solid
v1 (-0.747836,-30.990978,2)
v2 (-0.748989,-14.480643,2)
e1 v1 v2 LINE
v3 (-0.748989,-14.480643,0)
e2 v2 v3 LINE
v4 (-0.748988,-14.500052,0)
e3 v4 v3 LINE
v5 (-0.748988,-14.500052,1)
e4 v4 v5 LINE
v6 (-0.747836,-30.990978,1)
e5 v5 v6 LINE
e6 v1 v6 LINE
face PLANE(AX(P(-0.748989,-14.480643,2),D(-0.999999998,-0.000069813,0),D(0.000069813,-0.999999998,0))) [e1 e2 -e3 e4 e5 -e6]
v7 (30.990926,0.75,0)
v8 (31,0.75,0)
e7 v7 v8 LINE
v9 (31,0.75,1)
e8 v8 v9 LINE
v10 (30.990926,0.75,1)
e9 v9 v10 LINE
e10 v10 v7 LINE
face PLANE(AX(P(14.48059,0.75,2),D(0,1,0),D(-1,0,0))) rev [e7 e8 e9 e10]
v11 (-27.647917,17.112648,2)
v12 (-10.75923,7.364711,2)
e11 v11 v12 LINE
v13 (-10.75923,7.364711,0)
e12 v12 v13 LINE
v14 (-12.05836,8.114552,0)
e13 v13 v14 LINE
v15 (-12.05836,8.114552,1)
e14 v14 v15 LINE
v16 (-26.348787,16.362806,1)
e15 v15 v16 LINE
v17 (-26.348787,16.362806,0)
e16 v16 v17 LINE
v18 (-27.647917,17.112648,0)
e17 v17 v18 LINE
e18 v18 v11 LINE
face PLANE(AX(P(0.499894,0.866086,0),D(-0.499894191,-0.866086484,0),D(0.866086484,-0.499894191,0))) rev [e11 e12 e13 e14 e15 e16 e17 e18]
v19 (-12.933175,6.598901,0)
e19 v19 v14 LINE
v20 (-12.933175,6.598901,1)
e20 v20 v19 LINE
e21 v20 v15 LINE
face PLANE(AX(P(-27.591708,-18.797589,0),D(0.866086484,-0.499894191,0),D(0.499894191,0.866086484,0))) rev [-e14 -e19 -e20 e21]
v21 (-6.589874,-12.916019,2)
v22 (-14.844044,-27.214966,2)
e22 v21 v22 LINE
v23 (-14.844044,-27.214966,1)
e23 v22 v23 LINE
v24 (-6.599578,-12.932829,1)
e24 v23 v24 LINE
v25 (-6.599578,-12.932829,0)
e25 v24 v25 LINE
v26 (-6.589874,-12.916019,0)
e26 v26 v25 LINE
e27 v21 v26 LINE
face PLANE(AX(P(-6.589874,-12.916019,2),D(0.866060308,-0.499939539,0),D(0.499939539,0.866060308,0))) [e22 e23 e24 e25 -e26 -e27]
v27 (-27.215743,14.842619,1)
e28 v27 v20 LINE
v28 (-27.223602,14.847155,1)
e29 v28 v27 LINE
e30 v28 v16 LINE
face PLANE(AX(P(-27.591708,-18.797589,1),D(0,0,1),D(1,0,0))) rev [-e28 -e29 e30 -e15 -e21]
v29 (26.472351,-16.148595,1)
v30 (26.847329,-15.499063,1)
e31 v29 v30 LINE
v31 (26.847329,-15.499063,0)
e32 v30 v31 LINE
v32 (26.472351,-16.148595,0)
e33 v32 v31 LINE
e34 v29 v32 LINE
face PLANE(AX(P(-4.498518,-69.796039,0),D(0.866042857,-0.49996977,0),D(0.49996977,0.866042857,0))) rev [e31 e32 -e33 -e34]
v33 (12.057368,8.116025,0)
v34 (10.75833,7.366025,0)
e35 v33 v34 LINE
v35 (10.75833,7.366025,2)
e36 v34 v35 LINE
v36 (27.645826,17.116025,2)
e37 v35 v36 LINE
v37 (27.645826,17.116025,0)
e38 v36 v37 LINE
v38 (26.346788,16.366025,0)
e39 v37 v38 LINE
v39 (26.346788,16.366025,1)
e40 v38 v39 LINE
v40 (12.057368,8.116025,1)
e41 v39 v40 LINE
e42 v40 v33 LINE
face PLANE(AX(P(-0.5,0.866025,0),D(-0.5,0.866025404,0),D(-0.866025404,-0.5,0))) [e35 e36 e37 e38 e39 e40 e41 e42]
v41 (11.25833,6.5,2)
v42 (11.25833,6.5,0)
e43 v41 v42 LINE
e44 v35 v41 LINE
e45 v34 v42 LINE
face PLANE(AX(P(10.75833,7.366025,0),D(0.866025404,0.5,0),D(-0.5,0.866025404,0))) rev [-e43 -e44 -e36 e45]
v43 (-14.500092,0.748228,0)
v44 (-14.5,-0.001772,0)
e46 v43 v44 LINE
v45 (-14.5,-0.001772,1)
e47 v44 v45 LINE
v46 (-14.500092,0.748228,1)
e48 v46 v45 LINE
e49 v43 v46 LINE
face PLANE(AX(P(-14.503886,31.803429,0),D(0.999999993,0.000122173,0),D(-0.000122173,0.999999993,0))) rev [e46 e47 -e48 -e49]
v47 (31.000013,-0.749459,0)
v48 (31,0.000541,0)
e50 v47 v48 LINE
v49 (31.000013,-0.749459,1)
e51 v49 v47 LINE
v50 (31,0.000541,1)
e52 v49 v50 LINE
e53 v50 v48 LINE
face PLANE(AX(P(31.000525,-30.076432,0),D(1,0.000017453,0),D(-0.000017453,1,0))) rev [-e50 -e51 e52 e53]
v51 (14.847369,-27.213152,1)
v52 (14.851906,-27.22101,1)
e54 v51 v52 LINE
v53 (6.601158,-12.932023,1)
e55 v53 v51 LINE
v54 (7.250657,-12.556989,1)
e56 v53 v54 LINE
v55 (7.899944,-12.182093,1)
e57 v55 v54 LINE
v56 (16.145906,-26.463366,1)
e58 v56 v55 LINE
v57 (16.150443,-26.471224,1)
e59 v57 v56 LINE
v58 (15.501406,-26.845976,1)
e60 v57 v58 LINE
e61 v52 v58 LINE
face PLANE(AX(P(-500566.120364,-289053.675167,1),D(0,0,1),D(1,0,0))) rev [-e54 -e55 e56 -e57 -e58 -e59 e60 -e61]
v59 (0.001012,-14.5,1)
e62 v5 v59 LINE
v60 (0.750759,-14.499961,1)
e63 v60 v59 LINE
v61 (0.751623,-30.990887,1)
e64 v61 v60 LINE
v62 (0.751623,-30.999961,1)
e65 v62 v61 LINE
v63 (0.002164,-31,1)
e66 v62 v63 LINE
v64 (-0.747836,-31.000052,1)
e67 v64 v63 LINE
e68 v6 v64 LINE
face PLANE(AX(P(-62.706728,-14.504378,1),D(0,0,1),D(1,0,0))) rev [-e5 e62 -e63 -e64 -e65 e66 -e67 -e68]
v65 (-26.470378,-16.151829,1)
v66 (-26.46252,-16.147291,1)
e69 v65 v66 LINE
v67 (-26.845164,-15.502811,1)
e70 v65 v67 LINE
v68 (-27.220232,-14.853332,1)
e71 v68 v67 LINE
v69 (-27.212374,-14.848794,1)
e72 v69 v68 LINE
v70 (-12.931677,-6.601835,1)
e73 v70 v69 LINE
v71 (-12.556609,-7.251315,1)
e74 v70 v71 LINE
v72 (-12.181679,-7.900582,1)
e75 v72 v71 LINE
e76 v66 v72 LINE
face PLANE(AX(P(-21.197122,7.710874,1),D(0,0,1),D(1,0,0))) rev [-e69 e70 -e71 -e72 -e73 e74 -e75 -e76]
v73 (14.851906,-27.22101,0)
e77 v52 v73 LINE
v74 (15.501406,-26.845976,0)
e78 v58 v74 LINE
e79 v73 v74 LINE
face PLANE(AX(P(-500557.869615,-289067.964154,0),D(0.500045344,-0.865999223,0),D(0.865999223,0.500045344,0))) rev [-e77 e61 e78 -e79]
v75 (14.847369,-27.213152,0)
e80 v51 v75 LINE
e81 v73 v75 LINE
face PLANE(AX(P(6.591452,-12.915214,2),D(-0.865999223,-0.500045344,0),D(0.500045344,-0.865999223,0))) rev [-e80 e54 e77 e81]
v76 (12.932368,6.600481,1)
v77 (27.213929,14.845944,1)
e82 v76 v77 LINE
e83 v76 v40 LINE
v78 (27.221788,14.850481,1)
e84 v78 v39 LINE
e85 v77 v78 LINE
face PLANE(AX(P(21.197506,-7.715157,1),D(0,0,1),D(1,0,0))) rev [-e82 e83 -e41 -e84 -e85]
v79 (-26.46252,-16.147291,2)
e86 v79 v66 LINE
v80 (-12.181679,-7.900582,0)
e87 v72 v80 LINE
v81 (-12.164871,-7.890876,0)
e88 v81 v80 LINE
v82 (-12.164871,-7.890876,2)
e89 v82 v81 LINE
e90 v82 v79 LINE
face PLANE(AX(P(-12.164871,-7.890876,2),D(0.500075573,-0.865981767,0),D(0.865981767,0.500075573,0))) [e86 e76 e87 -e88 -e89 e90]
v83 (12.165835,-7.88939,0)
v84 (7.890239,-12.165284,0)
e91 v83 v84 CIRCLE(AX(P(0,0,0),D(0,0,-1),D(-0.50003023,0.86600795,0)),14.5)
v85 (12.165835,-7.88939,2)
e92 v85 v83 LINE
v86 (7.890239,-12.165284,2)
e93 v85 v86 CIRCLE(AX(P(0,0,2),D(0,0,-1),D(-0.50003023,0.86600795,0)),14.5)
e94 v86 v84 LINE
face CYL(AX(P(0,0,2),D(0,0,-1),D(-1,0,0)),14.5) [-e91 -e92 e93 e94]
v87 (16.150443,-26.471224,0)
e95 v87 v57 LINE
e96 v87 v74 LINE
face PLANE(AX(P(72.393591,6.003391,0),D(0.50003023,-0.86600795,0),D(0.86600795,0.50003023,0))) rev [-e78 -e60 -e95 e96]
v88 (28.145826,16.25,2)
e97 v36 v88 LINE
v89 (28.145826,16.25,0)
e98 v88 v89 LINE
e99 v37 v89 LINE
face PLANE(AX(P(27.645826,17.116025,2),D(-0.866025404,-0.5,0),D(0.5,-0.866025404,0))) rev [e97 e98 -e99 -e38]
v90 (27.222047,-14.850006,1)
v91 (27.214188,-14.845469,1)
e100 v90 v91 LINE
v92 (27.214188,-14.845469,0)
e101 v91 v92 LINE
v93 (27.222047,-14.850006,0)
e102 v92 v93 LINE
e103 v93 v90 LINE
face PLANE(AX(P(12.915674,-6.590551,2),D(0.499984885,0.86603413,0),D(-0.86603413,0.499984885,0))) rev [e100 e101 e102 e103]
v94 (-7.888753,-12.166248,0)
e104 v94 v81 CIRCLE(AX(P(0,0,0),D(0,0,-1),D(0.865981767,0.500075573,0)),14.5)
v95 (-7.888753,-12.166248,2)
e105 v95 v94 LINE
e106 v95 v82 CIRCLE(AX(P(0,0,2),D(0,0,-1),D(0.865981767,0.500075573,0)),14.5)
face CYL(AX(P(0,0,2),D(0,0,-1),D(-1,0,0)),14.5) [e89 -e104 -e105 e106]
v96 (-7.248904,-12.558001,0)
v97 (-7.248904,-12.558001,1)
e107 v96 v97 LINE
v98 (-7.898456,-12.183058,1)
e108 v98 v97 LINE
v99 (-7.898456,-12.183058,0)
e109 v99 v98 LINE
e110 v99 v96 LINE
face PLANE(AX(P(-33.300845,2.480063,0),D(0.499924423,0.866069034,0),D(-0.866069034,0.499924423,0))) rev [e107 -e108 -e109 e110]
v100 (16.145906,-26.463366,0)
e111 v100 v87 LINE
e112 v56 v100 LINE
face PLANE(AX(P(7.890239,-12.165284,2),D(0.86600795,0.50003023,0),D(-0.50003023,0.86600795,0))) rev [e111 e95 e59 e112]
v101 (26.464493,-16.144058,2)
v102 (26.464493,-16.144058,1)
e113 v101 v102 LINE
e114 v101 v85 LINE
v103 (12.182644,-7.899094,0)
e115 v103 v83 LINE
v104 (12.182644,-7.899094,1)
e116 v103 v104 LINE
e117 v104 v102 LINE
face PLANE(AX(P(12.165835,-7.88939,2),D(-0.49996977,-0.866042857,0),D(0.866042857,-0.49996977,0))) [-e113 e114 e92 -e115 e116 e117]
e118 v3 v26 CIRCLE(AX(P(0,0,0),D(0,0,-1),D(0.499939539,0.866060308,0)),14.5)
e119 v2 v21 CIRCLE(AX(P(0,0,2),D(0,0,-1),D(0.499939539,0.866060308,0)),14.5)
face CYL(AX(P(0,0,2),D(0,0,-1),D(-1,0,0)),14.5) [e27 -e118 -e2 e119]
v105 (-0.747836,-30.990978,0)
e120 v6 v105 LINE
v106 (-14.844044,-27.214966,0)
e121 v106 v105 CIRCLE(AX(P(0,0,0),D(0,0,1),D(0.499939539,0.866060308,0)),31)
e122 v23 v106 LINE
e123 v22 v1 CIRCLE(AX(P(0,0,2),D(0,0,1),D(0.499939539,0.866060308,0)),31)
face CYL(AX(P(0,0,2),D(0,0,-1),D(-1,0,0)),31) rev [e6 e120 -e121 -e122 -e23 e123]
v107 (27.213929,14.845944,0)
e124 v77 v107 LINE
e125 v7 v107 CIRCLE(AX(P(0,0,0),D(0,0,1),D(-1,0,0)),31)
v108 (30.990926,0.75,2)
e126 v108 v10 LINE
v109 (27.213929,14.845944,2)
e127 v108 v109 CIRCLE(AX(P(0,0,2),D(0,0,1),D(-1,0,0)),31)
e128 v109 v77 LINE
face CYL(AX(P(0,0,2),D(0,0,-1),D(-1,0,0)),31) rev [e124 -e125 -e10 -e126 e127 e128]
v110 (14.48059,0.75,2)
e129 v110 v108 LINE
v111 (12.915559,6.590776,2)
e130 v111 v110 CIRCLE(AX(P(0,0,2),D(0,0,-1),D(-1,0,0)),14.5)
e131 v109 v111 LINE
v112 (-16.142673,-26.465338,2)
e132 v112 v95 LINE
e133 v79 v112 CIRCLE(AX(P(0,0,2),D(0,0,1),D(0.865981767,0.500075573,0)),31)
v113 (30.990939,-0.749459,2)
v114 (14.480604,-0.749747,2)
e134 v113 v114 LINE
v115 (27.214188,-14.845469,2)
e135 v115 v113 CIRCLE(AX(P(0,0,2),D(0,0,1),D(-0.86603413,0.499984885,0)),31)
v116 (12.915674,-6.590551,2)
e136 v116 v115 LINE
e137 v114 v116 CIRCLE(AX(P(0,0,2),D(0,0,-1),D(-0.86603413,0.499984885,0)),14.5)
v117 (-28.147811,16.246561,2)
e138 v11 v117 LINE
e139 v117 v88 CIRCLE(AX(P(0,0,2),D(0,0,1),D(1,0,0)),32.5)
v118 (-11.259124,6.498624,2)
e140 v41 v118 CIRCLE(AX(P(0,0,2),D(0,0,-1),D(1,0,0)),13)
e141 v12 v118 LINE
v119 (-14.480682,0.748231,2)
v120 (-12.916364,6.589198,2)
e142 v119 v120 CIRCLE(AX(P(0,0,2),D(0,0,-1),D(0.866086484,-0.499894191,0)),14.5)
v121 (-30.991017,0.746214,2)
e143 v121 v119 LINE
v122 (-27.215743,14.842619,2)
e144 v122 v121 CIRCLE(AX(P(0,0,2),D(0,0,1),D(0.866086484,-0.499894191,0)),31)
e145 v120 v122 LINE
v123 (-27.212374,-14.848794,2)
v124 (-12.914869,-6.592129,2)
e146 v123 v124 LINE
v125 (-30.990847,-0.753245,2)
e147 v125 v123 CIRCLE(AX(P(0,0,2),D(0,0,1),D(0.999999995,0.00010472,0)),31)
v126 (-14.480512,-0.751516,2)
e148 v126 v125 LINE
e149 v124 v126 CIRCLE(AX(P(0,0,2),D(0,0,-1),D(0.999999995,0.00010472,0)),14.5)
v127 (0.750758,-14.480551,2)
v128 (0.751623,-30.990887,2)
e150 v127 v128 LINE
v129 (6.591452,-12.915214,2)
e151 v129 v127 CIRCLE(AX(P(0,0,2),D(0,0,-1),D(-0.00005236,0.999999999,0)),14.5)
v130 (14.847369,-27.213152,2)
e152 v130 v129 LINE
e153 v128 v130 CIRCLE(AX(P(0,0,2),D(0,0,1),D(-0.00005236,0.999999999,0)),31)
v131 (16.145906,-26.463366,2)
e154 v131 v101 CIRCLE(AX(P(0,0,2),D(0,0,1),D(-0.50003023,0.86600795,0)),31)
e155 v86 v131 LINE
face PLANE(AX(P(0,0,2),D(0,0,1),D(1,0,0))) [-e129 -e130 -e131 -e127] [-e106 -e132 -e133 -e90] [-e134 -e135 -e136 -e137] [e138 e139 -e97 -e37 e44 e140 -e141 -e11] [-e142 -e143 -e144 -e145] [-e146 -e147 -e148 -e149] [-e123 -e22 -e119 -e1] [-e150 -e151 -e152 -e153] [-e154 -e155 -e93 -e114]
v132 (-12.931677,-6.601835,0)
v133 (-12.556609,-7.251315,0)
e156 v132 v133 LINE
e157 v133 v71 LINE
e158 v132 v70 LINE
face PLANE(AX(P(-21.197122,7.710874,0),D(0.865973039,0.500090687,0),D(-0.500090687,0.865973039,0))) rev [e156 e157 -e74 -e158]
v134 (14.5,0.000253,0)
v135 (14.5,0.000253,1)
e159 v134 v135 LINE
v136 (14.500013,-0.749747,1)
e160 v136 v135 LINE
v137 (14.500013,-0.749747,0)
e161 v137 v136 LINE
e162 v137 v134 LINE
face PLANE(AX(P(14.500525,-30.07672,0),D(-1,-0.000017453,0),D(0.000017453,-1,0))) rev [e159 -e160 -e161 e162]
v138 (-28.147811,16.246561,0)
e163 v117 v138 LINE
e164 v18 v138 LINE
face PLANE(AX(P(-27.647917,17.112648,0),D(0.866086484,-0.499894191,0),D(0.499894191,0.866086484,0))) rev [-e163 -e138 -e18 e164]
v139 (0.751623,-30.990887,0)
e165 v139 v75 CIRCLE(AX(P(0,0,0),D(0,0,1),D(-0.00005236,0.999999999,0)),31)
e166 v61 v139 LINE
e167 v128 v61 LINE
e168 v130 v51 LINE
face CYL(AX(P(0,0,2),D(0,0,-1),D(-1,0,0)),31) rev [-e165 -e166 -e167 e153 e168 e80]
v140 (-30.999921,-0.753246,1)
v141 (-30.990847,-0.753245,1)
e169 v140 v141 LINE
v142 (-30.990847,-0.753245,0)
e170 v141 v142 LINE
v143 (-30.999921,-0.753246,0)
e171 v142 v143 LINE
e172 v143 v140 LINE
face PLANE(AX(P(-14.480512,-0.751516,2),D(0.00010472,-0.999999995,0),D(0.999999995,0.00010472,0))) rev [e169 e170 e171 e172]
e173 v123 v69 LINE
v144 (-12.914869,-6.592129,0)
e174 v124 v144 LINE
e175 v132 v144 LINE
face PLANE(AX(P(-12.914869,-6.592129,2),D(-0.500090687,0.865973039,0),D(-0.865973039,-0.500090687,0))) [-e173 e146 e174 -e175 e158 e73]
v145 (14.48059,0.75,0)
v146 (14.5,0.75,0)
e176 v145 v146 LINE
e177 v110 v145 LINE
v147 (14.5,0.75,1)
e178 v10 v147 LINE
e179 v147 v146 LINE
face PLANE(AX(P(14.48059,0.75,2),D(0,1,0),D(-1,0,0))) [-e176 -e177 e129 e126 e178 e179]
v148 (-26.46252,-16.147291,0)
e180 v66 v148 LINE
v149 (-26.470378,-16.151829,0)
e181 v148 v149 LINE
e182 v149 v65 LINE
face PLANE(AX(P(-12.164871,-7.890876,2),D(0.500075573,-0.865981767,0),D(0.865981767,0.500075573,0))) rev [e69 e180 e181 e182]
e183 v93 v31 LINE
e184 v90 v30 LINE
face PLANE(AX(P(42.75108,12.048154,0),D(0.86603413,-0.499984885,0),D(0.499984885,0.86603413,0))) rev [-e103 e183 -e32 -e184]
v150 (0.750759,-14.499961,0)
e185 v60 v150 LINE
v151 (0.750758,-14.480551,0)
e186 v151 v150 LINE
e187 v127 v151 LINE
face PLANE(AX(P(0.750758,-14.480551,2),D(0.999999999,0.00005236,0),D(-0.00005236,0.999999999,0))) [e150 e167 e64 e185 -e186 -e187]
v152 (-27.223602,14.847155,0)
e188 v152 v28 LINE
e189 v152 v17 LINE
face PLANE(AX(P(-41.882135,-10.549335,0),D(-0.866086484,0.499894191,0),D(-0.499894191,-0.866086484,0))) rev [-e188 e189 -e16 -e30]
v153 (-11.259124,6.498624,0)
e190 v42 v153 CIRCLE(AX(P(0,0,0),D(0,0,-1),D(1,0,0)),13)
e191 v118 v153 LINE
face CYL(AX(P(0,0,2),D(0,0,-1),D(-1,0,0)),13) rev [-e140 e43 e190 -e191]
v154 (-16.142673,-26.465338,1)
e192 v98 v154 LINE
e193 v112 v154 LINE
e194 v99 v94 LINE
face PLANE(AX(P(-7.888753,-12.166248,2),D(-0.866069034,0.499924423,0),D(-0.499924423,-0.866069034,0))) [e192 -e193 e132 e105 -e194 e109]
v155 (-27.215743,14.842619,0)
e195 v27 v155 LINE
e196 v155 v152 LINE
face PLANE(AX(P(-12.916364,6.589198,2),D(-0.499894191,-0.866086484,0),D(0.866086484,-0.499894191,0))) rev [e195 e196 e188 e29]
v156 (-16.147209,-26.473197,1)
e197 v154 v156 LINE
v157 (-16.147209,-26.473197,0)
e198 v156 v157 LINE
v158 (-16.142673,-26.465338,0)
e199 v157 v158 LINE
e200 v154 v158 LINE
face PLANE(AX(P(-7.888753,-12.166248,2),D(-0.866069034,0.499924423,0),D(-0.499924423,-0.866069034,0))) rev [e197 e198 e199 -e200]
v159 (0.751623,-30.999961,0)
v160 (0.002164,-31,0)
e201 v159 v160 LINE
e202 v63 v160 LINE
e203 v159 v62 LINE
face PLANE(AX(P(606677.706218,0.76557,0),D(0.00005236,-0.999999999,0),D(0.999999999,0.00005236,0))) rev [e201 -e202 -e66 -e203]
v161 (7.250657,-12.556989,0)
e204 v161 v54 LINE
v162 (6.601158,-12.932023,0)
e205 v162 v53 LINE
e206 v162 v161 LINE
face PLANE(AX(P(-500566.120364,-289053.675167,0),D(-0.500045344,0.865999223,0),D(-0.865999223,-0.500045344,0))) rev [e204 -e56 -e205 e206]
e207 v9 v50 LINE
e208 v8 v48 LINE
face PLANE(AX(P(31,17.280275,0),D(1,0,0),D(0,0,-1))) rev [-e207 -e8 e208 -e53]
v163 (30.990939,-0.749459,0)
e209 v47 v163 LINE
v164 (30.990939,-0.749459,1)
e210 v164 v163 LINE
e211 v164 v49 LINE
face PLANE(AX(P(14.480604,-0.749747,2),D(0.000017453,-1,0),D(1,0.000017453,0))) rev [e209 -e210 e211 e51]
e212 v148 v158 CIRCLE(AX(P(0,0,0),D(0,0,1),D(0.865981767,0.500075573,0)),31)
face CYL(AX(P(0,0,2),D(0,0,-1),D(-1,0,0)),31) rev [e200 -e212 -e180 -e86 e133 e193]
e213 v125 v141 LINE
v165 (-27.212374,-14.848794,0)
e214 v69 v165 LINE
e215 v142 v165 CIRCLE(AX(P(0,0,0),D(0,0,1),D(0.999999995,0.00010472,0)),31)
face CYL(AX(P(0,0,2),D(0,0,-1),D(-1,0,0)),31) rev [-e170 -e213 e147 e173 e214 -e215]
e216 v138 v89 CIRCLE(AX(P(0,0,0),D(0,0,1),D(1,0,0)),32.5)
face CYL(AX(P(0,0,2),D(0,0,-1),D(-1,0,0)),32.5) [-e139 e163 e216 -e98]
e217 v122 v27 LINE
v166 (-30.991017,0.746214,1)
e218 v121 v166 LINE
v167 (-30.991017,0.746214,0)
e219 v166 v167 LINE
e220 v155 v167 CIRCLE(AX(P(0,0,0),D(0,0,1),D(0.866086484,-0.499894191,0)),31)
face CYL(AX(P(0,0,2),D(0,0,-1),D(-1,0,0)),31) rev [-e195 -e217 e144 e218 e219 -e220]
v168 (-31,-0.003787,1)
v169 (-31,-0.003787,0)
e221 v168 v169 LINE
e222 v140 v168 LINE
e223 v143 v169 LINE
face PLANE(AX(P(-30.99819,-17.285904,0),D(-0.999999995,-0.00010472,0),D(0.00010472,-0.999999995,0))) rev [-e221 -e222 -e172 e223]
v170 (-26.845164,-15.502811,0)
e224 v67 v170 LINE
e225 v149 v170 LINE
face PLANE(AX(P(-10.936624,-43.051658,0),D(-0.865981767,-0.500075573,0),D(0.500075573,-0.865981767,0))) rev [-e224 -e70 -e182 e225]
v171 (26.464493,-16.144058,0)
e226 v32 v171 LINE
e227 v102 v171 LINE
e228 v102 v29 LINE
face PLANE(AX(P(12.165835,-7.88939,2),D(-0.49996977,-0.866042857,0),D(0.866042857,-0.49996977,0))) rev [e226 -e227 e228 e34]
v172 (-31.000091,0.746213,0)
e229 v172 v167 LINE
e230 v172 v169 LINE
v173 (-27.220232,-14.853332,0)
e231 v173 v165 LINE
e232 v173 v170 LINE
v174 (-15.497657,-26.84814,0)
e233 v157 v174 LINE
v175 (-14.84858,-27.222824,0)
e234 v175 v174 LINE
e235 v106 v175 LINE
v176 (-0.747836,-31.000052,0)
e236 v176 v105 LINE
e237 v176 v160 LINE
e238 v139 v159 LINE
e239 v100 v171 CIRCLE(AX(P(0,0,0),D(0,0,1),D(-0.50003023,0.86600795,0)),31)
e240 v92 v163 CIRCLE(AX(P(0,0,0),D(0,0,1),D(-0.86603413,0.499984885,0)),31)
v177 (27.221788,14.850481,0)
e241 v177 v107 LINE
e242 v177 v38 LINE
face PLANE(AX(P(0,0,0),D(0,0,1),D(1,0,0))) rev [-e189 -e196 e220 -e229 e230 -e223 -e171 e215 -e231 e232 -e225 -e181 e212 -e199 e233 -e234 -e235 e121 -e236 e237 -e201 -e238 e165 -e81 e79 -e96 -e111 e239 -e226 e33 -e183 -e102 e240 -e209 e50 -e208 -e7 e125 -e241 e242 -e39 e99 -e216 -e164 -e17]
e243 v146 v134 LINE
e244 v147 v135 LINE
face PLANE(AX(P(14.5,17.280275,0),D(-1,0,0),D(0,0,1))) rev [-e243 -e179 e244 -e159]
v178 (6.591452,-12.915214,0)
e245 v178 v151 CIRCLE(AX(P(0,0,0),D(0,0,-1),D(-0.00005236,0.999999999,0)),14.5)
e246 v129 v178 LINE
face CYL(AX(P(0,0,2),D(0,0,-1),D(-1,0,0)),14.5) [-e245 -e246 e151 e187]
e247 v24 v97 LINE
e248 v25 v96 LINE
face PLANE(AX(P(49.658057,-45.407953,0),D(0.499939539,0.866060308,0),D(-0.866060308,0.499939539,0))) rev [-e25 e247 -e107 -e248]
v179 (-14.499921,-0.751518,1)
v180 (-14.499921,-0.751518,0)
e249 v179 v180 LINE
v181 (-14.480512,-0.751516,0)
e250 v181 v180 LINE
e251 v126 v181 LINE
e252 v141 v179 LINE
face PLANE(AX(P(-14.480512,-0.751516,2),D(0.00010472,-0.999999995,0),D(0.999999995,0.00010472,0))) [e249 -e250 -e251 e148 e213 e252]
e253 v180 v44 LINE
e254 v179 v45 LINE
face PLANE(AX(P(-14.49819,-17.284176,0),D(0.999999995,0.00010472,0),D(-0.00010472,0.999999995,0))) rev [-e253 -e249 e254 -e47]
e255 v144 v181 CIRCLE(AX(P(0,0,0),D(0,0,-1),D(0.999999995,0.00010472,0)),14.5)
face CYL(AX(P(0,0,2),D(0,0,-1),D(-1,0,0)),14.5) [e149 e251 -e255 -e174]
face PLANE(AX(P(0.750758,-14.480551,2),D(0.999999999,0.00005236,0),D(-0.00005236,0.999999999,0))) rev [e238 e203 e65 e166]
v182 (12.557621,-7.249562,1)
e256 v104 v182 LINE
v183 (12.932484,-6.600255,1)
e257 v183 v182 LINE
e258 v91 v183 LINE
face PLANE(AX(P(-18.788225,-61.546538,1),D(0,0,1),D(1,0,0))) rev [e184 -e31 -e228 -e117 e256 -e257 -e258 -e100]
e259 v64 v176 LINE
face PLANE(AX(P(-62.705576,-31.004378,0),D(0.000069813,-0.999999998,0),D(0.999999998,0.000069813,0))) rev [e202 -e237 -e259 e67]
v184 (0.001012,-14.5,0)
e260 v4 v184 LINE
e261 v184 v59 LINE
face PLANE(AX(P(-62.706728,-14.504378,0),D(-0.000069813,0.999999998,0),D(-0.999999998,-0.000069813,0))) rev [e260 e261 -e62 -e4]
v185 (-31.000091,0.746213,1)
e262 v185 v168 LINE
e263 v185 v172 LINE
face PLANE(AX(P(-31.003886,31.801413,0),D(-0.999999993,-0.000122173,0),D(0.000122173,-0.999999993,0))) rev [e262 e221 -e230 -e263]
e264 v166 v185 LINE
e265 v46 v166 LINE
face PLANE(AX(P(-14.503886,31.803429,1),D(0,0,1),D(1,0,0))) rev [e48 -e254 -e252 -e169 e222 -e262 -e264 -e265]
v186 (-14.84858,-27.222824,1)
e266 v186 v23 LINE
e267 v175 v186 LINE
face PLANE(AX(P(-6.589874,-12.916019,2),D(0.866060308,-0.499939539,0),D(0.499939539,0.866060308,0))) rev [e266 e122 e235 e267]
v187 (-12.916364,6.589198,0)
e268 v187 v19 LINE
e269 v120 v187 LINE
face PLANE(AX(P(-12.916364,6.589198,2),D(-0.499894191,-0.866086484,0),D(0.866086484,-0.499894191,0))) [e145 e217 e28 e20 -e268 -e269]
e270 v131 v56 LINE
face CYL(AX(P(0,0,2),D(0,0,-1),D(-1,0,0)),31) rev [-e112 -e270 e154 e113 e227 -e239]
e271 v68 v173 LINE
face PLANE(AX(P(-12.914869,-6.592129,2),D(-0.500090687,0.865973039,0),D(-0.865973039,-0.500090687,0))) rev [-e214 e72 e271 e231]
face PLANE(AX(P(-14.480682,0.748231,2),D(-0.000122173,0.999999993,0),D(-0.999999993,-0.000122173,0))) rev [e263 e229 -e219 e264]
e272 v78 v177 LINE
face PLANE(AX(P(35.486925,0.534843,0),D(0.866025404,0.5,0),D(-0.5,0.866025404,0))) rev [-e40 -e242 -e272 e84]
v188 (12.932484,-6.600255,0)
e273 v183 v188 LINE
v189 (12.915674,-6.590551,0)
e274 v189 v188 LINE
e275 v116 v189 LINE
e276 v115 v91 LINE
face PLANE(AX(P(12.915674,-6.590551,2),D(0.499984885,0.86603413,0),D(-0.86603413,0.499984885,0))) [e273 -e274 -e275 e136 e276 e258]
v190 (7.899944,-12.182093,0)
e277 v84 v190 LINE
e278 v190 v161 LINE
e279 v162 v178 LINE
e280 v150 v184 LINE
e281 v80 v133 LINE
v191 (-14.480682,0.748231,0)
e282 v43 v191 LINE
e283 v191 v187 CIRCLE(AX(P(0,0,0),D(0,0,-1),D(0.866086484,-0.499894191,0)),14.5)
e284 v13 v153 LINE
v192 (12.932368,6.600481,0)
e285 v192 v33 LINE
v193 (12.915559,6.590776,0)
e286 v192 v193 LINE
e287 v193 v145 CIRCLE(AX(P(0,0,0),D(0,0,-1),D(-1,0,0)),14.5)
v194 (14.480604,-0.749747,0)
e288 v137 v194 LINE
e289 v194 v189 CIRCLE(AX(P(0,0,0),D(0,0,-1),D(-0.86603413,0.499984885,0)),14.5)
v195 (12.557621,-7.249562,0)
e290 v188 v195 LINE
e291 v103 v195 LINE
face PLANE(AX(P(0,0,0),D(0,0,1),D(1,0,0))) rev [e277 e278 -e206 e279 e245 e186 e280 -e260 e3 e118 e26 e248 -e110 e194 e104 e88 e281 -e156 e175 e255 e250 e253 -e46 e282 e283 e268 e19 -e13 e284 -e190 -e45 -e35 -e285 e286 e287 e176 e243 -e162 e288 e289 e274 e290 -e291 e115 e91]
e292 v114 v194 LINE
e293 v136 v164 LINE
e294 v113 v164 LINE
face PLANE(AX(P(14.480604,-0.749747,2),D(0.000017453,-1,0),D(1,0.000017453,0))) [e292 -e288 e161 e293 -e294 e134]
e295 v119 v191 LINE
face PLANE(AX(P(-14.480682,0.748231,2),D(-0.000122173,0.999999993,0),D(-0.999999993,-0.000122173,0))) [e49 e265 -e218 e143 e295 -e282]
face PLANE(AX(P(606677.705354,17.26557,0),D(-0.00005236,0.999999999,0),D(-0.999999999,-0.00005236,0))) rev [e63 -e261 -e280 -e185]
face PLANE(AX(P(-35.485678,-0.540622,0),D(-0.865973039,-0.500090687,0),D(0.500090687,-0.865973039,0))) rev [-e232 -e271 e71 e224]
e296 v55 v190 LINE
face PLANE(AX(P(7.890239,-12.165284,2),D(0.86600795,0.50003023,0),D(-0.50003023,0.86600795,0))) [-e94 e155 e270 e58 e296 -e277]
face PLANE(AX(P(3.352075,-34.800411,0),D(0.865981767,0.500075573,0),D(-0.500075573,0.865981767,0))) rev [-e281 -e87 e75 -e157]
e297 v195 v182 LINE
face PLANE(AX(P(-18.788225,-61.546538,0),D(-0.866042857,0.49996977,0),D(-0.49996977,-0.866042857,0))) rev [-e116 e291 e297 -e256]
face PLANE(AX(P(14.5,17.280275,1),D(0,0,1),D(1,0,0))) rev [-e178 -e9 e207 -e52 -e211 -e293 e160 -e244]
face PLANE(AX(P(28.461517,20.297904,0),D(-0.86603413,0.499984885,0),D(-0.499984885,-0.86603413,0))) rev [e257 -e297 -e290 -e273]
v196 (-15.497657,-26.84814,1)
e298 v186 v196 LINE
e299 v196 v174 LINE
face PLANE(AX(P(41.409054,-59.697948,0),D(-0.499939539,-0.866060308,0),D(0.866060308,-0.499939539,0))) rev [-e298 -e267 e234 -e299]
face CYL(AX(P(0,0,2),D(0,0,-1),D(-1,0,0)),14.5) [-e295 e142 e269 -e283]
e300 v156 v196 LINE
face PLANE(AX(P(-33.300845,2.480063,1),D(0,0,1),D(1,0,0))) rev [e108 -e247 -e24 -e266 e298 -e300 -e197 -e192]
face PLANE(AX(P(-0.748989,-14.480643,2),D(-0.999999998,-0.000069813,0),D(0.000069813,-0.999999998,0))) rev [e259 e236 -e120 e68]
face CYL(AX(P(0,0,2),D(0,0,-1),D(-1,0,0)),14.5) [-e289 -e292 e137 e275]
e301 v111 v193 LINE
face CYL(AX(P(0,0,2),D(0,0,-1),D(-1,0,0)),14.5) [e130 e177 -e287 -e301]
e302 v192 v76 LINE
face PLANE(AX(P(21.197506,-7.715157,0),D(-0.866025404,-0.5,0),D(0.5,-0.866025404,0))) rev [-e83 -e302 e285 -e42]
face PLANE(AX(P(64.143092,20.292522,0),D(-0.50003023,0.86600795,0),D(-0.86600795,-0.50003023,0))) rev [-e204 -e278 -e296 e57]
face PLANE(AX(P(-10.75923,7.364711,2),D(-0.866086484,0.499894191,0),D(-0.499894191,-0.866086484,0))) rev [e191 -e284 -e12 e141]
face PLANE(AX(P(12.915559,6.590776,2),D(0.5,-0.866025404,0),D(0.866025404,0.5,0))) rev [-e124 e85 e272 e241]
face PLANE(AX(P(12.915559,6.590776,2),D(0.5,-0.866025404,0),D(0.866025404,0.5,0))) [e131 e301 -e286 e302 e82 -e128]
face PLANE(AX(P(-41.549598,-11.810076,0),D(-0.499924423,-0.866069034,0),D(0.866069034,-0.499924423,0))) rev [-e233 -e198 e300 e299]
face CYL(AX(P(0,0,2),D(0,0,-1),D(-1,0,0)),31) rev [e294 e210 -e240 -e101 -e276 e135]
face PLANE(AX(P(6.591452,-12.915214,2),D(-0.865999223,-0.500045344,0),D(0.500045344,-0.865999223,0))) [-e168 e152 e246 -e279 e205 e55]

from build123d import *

# Parameters (mm, degrees)
BOSS_EXTRU_1_DEPTH             = 2
ESQUISSE2_W                    = 16.5
ESQUISSE2_H                    = 1
ENL_V_MAT_EXTRU_1_DEPTH        = 0.75
ESQUISSE3_W                    = 16.5
ESQUISSE3_H                    = 1
ENL_V_MAT_EXTRU_2_DEPTH        = 0.75
R_P_TITION_CIRCULAIRE1_DEPTH   = 2
R_P_TITION_START               = 1
R_P_TITION_CIRCULAIRE1_2_DEPTH = 1
BOSS_EXTRU_2_DEPTH             = 1
BOSS_EXTRU_3_DEPTH             = 1


# Read off the part's stored shape, not the designer's step: Répétition circulaire1
with BuildPart() as part:
    # Esquisse1 → Boss.-Extru.1 (new body)
    with BuildSketch(Plane.XY):
        with BuildLine():
            Line((11.258330249, 6.5), (28.145825623, 16.25))
            ThreePointArc((28.145825623, 16.25), (31.392589354, 8.411618966), (32.5, 0))
            Line((32.5, 0), (13, 0))
            ThreePointArc((13, 0), (12.557035742, 3.364647586), (11.258330249, 6.5))
        make_face()
        with BuildLine():
            Line((12.915559198, 6.590776176), (27.213929282, 14.845943993))
            ThreePointArc((27.213929282, 14.845943993), (29.943700615, 8.023390398), (30.990926091, 0.75))
            Line((30.990926091, 0.75), (14.480590458, 0.75))
            ThreePointArc((14.480590458, 0.75), (14.005924481, 3.752876154), (12.915559198, 6.590776176))
        make_face(mode=Mode.SUBTRACT)
    extrude(amount=BOSS_EXTRU_1_DEPTH)

    # Esquisse2 → Enlèv. mat.-Extru.1 (cut)
    with BuildSketch(Plane(origin=(0, 0, 0), x_dir=(0.866025403784438, 0.5000000000000011, 0), z_dir=(-0.5000000000000011, 0.8660254037844382, 0))):
        with Locations((22.75, -0.5)):
            Rectangle(ESQUISSE2_W, ESQUISSE2_H)
    extrude(amount=-ENL_V_MAT_EXTRU_1_DEPTH, mode=Mode.SUBTRACT)

    # Esquisse3 → Enlèv. mat.-Extru.2 (cut)
    with BuildSketch(Plane.XZ):
        with Locations((22.75, 0.5)):
            Rectangle(ESQUISSE3_W, ESQUISSE3_H)
    extrude(amount=-ENL_V_MAT_EXTRU_2_DEPTH, mode=Mode.SUBTRACT)

    # Répétition circulaire1 outline → Répétition circulaire1 (add)
    with BuildSketch(Plane.XY):
        with BuildLine():
            Line((14.500000002, 0), (13, 0))
            ThreePointArc((13, 0), (-3.363880515, -12.557241253), (-11.25912429, 6.498624487))
            Line((-11.25912429, 6.498624487), (-12.558254016, 7.248465774))
            Line((-12.558254016, 7.248465774), (-12.933174659, 6.598900911))
            Line((-12.933174659, 6.598900911), (-12.916364317, 6.589198194))
            ThreePointArc((-12.916364317, 6.589198194), (-14.006382877, 3.75116498), (-14.480681979, 0.748230857))
            Line((-14.480681979, 0.748230857), (-14.500091522, 0.748228486))
            Line((-14.500091522, 0.748228486), (-14.499999892, -0.001771509))
            Line((-14.499999892, -0.001771509), (-14.499921381, -0.751518432))
            Line((-14.499921381, -0.751518432), (-14.480511838, -0.7515164))
            ThreePointArc((-14.480511838, -0.7515164), (-14.005531404, -3.75434283), (-12.914868943, -6.592128654))
            Line((-12.914868943, -6.592128654), (-12.931677083, -6.601835185))
            Line((-12.931677083, -6.601835185), (-12.556609068, -7.251314965))
            Line((-12.556609068, -7.251314965), (-12.181678945, -7.900582135))
            Line((-12.181678945, -7.900582135), (-12.164870636, -7.890875897))
            ThreePointArc((-12.164870636, -7.890875897), (-10.252153541, -10.253943035), (-7.888752606, -12.166247668))
            Line((-7.888752606, -12.166247668), (-7.898455911, -12.183057672))
            Line((-7.898455911, -12.183057672), (-7.248904135, -12.558000989))
            Line((-7.248904135, -12.558000989), (-6.599578081, -12.932829124))
            Line((-6.599578081, -12.932829124), (-6.589874484, -12.91601929))
            ThreePointArc((-6.589874484, -12.91601929), (-3.751898347, -14.006186447), (-0.748989062, -14.480642782))
            Line((-0.748989062, -14.480642782), (-0.748987707, -14.500052325))
            Line((-0.748987707, -14.500052325), (0.001012291, -14.499999965))
            Line((0.001012291, -14.499999965), (0.750759217, -14.49996071))
            Line((0.750759217, -14.49996071), (0.750758201, -14.480551168))
            ThreePointArc((0.750758201, -14.480551168), (3.753609497, -14.005727962), (6.591452424, -12.915214088))
            Line((6.591452424, -12.915214088), (6.601158075, -12.932022737))
            Line((6.601158075, -12.932022737), (7.250657492, -12.556988728))
            Line((7.250657492, -12.556988728), (7.899944293, -12.182092602))
            Line((7.899944293, -12.182092602), (7.890238935, -12.165283784))
            ThreePointArc((7.890238935, -12.165283784), (10.25340622, -10.252690422), (12.165834597, -7.889389619))
            Line((12.165834597, -7.889389619), (12.182644093, -7.899093804))
            Line((12.182644093, -7.899093804), (12.55762142, -7.249561661))
            Line((12.55762142, -7.249561661), (12.932483553, -6.600255234))
            Line((12.932483553, -6.600255234), (12.915674227, -6.590550756))
            ThreePointArc((12.915674227, -6.590550756), (14.005989979, -3.752631704), (14.480603545, -0.749747266))
            Line((14.480603545, -0.749747266), (14.500013088, -0.749746927))
            Line((14.500013088, -0.749746927), (14.500000002, 0))
        make_face()
        with BuildLine():
            Line((32.5, 0), (31.000000004, 0))
            Line((31.000000004, 0), (31.000013085, -0.749458948))
            Line((31.000013085, -0.749458948), (30.990939177, -0.749459106))
            ThreePointArc((30.990939177, -0.749459106), (29.943840645, -8.022867781), (27.214188388, -14.845469018))
            Line((27.214188388, -14.845469018), (27.222046703, -14.850005835))
            Line((27.222046703, -14.850005835), (26.847328557, -15.499062863))
            Line((26.847328557, -15.499062863), (26.472351226, -16.148595003))
            Line((26.472351226, -16.148595003), (26.464492832, -16.144058323))
            ThreePointArc((26.464492832, -16.144058323), (21.921075367, -21.91954504), (16.145905854, -26.4633657))
            Line((16.145905854, -26.4633657), (16.150443083, -26.471223777))
            Line((16.150443083, -26.471223777), (15.501405676, -26.845975906))
            Line((15.501405676, -26.845975906), (14.851906256, -27.221009911))
            Line((14.851906256, -27.221009911), (14.847368891, -27.213151913))
            ThreePointArc((14.847368891, -27.213151913), (8.024958236, -29.94328047), (0.75162268, -30.990886779))
            Line((0.75162268, -30.990886779), (0.751623155, -30.999960688))
            Line((0.751623155, -30.999960688), (0.002164208, -30.999999929))
            Line((0.002164208, -30.999999929), (-0.74783579, -31.000052284))
            Line((-0.74783579, -31.000052284), (-0.747836423, -30.990978376))
            ThreePointArc((-0.747836423, -30.990978376), (-8.021299914, -29.94426068), (-14.844044066, -27.214965658))
            Line((-14.844044066, -27.214965658), (-14.848580472, -27.22282421))
            Line((-14.848580472, -27.22282421), (-15.497657119, -26.848140049))
            Line((-15.497657119, -26.848140049), (-16.147208892, -26.473196728))
            Line((-16.147208892, -26.473196728), (-16.142672624, -26.465338097))
            ThreePointArc((-16.142672624, -26.465338097), (-21.918397225, -21.922223041), (-26.462520266, -16.147291451))
            Line((-26.462520266, -16.147291451), (-26.470378105, -16.151829091))
            Line((-26.470378105, -16.151829091), (-26.845164218, -15.502811306))
            Line((-26.845164218, -15.502811306), (-27.220232229, -14.853331525))
            Line((-27.220232229, -14.853331525), (-27.212374469, -14.848793747))
            ThreePointArc((-27.212374469, -14.848793747), (-29.942860243, -8.026526051), (-30.990847382, -0.753245358))
            Line((-30.990847382, -0.753245358), (-30.99992129, -0.753246308))
            Line((-30.99992129, -0.753246308), (-30.999999773, -0.003787364))
            Line((-30.999999773, -0.003787364), (-31.000091398, 0.74621263))
            Line((-31.000091398, 0.74621263), (-30.99101749, 0.746213739))
            ThreePointArc((-30.99101749, 0.746213739), (-29.944680634, 8.019732025), (-27.215742853, 14.842619073))
            Line((-27.215742853, 14.842619073), (-27.223601643, 14.847155068))
            Line((-27.223601643, 14.847155068), (-26.848680999, 15.49671993))
            Line((-26.848680999, 15.49671993), (-28.147810725, 16.246561217))
            ThreePointArc((-28.147810725, 16.246561217), (-8.409701286, -31.393103132), (32.5, 0))
        make_face()
    extrude(amount=R_P_TITION_CIRCULAIRE1_DEPTH)

    # R_p_tition circulaire1 2 outline → R_p_tition circulaire1 2 (add)
    with BuildSketch(Plane.XY.offset(R_P_TITION_START)):
        Polygon((31.000000004, 0), (14.500000002, 0), (14.500013088, -0.749746927), (30.990939177, -0.749459106), (31.000013085, -0.749458948), align=None)
        Polygon((-12.933174659, 6.598900911), (-12.558254016, 7.248465774), (-26.848680999, 15.49671993), (-27.223601643, 14.847155068), (-27.215742853, 14.842619073), align=None)
        Polygon((27.222046703, -14.850005835), (27.214188388, -14.845469018), (12.932483553, -6.600255234), (12.557621422, -7.249561662), (12.182644093, -7.899093803), (26.464492832, -16.144058323), (26.472351226, -16.148595003), (26.847328553, -15.499062861), align=None)
        Polygon((-14.500091522, 0.748228486), (-30.99101749, 0.746213739), (-31.000091398, 0.74621263), (-30.999999769, -0.003787364), (-30.99992129, -0.753246308), (-30.990847382, -0.753245358), (-14.499921381, -0.751518433), (-14.499999894, -0.001771509), align=None)
        Polygon((16.150443083, -26.471223777), (16.145905854, -26.4633657), (7.899944293, -12.182092602), (7.250657493, -12.55698873), (6.601158075, -12.932022737), (14.84736889, -27.213151913), (14.851906256, -27.221009911), (15.501405673, -26.845975902), align=None)
        Polygon((-12.931677083, -6.601835185), (-27.212374469, -14.848793747), (-27.220232229, -14.853331525), (-26.845164214, -15.502811304), (-26.470378105, -16.151829091), (-26.462520266, -16.147291451), (-12.181678945, -7.900582135), (-12.55660907, -7.251314966), align=None)
        Polygon((0.751623155, -30.999960688), (0.75162268, -30.990886779), (0.750759217, -14.49996071), (0.001012291, -14.499999967), (-0.748987707, -14.500052325), (-0.747836423, -30.990978376), (-0.74783579, -31.000052284), (0.002164208, -30.999999924), align=None)
        Polygon((-7.898455911, -12.183057672), (-16.142672624, -26.465338097), (-16.147208892, -26.473196728), (-15.497657117, -26.848140045), (-14.848580472, -27.22282421), (-14.844044066, -27.214965658), (-6.599578081, -12.932829124), (-7.248904136, -12.558000991), align=None)
    extrude(amount=R_P_TITION_CIRCULAIRE1_2_DEPTH)

    # Esquisse5 → Boss.-Extru.2 (add)
    with BuildSketch(Plane(origin=(0, 0, 0), x_dir=(0.866025403784438, 0.5000000000000011, 0), z_dir=(-0.5000000000000011, 0.8660254037844382, 0))):
        Polygon((32.5, 0), (31, 0), (31, -1), (14.5, -1), (14.5, 0), (13, 0), (13, -2), (32.5, -2), align=None)
    extrude(amount=BOSS_EXTRU_2_DEPTH)

    # Esquisse6 → Boss.-Extru.3 (add)
    with BuildSketch(Plane(origin=(0, 0, 0), x_dir=(0.8660864838448452, -0.4998941913057929, 0), z_dir=(0.49989419130579293, 0.8660864838448453, 0))):
        Polygon((-14.5, -1), (-31, -1), (-31, 0), (-32.5, 0), (-32.5, -2), (-13, -2), (-13, 0), (-14.5, 0), align=None)
    extrude(amount=BOSS_EXTRU_3_DEPTH)


solid = part.part
